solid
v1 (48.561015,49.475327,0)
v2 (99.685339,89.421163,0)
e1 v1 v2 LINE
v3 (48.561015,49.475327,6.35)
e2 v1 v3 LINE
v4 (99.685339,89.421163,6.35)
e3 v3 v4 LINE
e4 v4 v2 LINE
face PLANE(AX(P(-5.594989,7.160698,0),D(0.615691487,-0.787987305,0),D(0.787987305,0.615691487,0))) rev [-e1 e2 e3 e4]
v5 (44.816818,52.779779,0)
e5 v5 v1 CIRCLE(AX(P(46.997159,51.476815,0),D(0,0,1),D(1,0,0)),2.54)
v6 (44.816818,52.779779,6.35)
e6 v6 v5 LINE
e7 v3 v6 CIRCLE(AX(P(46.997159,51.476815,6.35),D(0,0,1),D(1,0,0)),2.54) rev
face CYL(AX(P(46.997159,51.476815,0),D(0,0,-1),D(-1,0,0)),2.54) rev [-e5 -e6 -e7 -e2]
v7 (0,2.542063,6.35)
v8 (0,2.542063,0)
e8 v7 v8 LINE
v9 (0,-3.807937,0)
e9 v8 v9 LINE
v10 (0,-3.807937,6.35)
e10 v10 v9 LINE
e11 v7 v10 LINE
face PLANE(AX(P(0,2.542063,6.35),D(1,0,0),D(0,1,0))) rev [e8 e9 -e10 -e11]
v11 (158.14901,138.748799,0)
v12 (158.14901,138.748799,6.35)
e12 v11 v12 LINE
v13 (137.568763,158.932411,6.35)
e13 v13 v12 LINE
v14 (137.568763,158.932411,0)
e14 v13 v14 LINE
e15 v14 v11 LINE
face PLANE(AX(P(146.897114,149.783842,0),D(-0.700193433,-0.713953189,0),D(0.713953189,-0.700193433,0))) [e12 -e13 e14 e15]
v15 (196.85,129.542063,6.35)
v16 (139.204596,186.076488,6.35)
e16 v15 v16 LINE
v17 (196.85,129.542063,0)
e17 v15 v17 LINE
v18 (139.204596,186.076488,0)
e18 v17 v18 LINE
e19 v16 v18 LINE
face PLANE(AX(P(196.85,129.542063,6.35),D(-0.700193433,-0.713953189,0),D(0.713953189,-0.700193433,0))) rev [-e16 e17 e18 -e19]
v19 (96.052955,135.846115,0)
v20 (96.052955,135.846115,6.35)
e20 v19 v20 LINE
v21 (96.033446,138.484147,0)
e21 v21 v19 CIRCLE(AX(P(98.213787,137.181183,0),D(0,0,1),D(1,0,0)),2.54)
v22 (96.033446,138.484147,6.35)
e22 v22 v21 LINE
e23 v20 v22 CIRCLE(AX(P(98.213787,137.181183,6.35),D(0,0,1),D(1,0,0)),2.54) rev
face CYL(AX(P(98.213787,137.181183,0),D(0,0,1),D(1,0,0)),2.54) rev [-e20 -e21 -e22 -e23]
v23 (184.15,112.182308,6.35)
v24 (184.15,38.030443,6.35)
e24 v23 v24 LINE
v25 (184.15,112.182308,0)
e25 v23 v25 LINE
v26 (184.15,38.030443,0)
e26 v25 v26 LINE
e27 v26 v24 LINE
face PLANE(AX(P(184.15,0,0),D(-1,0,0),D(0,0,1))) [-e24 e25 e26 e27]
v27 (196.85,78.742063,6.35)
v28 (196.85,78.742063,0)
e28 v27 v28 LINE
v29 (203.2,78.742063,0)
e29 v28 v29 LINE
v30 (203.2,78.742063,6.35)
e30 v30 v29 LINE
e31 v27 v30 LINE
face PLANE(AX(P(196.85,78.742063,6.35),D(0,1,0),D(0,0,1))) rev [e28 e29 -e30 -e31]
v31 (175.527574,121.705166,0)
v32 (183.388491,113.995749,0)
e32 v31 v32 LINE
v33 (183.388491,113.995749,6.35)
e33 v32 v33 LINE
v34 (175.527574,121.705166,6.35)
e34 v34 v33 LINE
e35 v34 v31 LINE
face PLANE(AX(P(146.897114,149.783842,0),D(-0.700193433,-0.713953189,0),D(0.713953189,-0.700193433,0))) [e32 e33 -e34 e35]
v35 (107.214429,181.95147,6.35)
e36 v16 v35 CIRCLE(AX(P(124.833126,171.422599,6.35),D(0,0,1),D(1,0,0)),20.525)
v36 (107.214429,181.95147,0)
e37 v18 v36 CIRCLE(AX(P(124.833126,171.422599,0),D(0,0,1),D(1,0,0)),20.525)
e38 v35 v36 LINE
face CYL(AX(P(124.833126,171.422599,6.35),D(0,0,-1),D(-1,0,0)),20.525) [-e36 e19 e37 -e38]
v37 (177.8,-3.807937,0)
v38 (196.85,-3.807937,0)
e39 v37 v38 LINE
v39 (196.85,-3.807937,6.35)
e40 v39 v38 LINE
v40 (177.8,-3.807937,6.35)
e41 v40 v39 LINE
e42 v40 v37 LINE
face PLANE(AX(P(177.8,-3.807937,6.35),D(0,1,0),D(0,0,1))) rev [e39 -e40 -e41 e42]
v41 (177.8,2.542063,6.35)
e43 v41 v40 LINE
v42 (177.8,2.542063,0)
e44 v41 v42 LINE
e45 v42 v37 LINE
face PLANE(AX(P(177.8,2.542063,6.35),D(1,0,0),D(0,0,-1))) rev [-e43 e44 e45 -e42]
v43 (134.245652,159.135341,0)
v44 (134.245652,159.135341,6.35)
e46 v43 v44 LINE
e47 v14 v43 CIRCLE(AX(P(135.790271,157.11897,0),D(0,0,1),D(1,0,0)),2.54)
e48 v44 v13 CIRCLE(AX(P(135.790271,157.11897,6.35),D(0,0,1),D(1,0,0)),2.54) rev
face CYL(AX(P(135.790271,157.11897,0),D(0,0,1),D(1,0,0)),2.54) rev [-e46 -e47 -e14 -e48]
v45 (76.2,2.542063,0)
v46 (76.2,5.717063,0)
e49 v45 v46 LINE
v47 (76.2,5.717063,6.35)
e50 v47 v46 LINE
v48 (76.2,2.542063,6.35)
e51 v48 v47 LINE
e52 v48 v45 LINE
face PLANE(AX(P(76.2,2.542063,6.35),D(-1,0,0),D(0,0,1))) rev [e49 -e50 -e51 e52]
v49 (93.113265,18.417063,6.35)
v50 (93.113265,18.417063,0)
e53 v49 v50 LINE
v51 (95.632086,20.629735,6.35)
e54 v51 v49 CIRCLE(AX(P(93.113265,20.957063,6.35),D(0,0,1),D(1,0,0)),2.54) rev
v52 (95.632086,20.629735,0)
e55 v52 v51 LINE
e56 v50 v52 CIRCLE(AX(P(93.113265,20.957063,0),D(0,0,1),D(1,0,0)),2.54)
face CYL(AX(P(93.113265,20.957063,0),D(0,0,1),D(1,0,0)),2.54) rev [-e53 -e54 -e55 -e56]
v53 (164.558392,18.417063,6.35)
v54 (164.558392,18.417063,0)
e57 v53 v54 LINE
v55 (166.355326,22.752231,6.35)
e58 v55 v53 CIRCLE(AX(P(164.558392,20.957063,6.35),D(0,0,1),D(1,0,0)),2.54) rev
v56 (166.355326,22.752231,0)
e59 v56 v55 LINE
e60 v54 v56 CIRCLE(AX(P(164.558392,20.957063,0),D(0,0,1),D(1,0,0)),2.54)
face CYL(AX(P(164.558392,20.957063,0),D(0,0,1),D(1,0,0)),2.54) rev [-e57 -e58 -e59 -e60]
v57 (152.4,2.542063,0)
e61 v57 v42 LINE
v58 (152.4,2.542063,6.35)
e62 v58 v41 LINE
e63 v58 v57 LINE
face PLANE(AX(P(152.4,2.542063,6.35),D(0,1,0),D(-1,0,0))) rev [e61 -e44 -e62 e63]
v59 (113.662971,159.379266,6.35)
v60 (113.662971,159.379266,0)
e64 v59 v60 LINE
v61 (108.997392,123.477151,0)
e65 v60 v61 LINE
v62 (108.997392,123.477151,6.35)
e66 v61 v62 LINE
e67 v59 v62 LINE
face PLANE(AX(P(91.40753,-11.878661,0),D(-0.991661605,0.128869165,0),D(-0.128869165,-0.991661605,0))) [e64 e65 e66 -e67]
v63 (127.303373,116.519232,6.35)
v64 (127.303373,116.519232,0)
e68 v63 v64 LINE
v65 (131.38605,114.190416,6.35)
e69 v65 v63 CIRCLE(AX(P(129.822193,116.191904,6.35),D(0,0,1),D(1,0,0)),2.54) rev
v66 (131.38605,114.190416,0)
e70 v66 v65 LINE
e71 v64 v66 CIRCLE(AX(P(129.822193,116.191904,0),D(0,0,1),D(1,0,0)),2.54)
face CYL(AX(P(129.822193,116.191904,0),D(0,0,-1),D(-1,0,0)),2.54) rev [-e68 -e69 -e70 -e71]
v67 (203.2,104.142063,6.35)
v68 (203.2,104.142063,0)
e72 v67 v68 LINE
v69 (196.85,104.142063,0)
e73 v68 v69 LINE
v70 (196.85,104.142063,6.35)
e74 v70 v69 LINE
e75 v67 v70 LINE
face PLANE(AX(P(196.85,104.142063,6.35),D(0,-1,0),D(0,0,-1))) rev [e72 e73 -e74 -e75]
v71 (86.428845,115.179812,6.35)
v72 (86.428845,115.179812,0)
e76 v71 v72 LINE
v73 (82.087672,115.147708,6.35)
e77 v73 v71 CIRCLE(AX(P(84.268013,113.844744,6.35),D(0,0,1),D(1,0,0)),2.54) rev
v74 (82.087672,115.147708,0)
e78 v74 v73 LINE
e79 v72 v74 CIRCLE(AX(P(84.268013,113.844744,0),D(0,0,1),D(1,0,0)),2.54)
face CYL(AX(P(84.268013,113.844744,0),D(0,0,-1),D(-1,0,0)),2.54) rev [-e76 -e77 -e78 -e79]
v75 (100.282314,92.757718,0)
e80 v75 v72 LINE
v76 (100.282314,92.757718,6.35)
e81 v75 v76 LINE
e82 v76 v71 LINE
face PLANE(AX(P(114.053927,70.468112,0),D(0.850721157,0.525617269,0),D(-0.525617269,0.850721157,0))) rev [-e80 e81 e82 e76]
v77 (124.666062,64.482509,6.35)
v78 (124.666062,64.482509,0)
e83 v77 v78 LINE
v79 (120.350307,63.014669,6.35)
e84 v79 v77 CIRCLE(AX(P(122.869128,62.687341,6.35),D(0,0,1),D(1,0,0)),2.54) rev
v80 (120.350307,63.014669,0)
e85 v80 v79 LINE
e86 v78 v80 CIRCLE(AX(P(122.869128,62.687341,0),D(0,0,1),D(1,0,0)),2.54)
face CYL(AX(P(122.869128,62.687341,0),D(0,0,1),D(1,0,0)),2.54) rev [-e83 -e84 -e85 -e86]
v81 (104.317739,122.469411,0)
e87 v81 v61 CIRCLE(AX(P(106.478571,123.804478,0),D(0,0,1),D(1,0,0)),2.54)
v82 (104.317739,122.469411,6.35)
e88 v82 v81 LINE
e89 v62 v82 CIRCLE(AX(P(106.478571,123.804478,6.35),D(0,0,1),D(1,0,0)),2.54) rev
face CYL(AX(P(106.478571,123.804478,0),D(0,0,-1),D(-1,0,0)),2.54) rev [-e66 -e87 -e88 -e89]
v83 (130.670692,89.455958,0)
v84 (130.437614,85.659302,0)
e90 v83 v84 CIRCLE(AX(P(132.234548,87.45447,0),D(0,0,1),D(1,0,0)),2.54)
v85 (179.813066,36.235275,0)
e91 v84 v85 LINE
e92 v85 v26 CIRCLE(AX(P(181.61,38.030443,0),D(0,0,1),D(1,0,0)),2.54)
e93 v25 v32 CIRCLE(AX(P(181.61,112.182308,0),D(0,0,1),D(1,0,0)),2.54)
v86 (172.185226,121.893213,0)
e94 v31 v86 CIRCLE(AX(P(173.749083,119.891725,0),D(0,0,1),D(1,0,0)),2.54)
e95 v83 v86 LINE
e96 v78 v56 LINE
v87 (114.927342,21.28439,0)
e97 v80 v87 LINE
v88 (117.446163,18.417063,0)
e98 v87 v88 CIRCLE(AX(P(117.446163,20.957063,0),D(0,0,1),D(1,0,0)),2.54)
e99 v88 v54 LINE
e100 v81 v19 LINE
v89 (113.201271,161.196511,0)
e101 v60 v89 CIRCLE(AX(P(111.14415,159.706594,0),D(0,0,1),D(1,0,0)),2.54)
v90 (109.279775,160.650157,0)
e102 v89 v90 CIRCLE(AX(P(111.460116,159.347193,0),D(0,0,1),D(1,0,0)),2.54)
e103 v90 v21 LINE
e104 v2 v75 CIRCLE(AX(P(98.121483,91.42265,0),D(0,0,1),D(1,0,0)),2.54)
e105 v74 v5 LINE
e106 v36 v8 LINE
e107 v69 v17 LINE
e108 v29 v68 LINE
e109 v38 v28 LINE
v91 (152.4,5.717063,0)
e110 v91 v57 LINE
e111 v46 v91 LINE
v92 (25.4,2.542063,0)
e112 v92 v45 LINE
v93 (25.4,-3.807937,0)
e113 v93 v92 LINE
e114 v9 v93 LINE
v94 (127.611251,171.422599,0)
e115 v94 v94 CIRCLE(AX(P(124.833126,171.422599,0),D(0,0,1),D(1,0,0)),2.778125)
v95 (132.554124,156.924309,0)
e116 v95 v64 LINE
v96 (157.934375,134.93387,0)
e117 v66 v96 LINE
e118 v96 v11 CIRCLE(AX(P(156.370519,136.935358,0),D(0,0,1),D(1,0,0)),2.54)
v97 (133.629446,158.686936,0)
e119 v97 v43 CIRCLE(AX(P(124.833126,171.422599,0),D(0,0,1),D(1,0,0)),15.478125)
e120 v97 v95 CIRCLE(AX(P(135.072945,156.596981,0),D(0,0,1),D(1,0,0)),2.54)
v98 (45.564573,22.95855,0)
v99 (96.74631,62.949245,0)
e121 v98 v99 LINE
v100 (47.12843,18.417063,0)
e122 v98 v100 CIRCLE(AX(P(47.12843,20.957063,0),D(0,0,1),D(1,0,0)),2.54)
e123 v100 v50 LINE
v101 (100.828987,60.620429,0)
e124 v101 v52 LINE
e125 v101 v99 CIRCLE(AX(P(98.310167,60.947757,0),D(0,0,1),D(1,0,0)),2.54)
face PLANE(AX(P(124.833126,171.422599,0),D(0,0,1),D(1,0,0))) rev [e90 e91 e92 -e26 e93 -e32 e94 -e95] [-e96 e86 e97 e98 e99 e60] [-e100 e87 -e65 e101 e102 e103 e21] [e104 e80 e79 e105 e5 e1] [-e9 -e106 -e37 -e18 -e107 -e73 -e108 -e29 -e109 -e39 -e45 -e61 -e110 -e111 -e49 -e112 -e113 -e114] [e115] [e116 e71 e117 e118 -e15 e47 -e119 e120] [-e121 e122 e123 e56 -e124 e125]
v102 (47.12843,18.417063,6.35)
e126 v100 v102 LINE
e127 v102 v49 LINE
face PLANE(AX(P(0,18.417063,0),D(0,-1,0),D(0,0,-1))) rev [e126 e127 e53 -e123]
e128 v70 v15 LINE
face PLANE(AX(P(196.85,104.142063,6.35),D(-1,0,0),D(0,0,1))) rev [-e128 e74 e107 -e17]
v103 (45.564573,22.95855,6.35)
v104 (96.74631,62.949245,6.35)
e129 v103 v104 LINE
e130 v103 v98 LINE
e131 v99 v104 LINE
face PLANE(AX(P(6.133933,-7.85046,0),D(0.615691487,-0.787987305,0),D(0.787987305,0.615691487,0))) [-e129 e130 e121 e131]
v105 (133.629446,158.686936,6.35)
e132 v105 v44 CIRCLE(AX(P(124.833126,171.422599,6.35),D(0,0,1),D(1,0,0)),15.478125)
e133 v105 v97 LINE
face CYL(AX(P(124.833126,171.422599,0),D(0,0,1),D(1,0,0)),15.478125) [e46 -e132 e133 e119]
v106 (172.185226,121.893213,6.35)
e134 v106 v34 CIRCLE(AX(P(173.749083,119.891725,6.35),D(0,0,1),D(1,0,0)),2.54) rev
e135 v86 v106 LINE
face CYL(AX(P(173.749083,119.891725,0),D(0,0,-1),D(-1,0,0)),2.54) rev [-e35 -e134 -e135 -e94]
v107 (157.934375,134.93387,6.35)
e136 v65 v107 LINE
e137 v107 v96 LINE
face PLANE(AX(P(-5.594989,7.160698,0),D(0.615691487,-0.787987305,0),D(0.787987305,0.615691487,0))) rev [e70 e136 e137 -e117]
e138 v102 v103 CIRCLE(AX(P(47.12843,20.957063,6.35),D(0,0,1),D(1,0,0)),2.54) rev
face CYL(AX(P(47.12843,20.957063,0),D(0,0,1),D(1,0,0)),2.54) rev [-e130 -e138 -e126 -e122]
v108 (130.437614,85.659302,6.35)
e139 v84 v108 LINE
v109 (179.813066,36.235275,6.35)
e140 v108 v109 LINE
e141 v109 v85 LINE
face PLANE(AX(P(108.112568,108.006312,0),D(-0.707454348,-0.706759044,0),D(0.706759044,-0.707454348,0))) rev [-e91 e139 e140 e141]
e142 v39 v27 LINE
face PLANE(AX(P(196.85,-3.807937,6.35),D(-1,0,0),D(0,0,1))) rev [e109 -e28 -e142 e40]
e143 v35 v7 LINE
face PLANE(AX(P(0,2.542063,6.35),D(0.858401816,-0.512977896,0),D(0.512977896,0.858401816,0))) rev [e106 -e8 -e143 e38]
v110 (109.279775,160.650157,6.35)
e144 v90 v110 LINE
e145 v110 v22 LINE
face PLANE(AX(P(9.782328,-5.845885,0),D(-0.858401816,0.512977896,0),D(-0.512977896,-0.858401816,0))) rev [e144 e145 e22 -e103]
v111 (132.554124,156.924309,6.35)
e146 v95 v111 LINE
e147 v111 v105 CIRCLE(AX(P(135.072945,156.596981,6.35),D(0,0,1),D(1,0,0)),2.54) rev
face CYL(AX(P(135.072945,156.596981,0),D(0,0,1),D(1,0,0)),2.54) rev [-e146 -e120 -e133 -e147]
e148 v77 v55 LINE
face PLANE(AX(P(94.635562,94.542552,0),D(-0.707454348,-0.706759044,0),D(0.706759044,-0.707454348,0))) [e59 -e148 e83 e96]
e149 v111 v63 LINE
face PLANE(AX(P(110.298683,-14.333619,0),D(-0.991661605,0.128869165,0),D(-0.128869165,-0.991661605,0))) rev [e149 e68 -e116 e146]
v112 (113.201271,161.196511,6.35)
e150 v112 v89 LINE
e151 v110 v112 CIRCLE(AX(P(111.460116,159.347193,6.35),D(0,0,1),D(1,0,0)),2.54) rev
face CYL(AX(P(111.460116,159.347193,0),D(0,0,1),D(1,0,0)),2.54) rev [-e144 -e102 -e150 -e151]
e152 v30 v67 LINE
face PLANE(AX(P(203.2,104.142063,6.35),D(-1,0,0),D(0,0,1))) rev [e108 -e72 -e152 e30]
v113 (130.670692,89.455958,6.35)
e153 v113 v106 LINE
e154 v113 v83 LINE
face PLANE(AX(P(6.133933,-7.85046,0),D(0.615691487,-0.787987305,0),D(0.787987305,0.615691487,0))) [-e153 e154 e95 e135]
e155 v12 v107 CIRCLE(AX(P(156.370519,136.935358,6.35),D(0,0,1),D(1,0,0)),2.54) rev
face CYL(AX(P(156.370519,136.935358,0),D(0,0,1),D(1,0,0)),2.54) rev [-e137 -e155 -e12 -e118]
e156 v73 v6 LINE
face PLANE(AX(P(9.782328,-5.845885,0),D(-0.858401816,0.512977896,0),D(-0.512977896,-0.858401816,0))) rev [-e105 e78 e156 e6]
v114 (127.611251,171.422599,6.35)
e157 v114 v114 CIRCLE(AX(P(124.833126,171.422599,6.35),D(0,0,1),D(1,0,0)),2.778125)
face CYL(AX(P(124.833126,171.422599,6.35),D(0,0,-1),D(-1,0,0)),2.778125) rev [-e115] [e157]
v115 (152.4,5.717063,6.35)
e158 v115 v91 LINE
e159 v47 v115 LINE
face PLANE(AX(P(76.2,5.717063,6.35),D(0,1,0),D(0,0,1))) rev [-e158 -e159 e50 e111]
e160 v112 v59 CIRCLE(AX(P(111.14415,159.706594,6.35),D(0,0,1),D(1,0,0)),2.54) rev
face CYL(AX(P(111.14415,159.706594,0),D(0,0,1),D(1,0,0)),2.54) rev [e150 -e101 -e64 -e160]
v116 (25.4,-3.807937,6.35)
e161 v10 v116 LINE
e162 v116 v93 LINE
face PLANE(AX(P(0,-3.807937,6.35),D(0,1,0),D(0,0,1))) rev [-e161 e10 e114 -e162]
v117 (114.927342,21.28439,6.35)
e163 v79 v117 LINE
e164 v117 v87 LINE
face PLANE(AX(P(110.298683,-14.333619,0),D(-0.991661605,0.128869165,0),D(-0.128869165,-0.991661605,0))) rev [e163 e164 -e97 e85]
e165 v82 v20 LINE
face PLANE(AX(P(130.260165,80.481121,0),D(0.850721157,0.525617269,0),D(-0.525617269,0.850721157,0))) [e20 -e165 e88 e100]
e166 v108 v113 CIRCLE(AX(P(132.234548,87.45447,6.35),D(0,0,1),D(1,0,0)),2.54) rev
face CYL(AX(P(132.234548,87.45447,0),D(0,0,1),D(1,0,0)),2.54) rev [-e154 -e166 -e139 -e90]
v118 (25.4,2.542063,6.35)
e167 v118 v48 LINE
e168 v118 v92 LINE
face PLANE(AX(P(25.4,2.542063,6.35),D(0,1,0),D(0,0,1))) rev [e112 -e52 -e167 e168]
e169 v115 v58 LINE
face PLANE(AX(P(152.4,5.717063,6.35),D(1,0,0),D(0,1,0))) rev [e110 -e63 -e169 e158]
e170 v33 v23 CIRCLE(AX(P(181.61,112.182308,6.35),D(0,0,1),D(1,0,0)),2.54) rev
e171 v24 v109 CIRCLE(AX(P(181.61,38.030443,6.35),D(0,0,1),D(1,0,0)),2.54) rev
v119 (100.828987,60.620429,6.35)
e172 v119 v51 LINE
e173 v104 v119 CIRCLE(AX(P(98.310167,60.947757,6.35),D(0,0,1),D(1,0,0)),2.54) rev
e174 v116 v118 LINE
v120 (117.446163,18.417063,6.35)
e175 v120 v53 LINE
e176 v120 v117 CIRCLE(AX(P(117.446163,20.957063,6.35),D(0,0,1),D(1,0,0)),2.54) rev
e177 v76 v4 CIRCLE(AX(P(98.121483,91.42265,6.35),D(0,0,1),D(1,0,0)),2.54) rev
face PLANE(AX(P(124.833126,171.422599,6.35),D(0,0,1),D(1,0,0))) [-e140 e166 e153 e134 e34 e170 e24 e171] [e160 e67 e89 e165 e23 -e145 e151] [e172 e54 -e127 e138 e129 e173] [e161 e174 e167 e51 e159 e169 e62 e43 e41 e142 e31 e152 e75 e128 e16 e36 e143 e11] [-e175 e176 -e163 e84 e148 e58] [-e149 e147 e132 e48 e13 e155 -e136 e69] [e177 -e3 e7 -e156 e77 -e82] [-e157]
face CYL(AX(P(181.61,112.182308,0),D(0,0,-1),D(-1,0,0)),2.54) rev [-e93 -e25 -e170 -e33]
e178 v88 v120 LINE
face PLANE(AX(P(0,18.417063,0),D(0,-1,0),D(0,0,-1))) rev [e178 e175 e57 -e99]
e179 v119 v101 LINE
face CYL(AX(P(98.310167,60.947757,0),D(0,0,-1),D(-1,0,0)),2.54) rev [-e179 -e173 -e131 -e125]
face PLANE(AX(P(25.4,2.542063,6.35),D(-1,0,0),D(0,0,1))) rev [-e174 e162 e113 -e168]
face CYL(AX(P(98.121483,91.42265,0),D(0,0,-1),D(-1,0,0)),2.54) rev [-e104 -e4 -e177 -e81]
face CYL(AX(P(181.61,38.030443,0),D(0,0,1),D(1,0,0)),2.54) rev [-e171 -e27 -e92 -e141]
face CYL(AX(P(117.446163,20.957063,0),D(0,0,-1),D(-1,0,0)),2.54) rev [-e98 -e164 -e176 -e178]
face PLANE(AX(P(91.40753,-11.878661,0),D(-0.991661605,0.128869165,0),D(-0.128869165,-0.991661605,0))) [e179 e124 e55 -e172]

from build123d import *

# Parameters (mm, degrees)
SKETCH2_R           = 2.778125
BOSS_EXTRUDE1_DEPTH = 6.35
CUT_EXTRUDE1_DEPTH  = 280.596929737
FILLET1_R           = 2.54


with BuildPart() as part:
    # Sketch2 → Boss-Extrude1 (new body)
    with BuildSketch(Plane.XY):
        with BuildLine():
            Line((25.4, 2.542062626), (76.2, 2.542062626))
            Line((76.2, 2.542062626), (76.2, 5.717062626))
            Line((76.2, 5.717062626), (152.4, 5.717062626))
            Line((152.4, 5.717062626), (152.4, 2.542062626))
            Line((152.4, 2.542062626), (177.8, 2.542062626))
            Line((177.8, 2.542062626), (177.8, -3.807937374))
            Line((177.8, -3.807937374), (196.85, -3.807937374))
            Line((196.85, -3.807937374), (196.85, 78.742062626))
            Line((196.85, 78.742062626), (203.2, 78.742062626))
            Line((203.2, 78.742062626), (203.2, 104.142062626))
            Line((203.2, 104.142062626), (196.85, 104.142062626))
            Line((196.85, 104.142062626), (196.85, 129.542062626))
            Line((196.85, 129.542062626), (139.204596213, 186.076487834))
            ThreePointArc((139.204596213, 186.076487834), (122.208232851, 191.779061014), (107.214428724, 181.951469947))
            Line((107.214428724, 181.951469947), (0, 2.542062626))
            Line((0, 2.542062626), (0, -3.807937374))
            Line((0, -3.807937374), (25.4, -3.807937374))
            Line((25.4, -3.807937374), (25.4, 2.542062626))
        make_face()
        with Locations((124.833126, 171.422598626)):
            Circle(SKETCH2_R, mode=Mode.SUBTRACT)
    extrude(amount=BOSS_EXTRUDE1_DEPTH)

    # Sketch4 → Cut-Extrude1 (cut, through all)
    with BuildSketch(Plane.XY.offset(6.35)):
        with BuildLine():
            ThreePointArc((113.815309866, 160.551532388), (112.421969705, 162.174055338), (111.26558656, 163.973153877))
            Line((111.26558656, 163.973153877), (95.241664491, 137.159203595))
            Line((95.241664491, 137.159203595), (108.075962418, 116.386657845))
            Line((108.075962418, 116.386657845), (113.815309866, 160.551532388))
        make_face()
        with BuildLine():
            Line((160.218857543, 136.71884322), (135.883782706, 160.584917146))
            ThreePointArc((135.883782706, 160.584917146), (134.376571421, 159.23674605), (132.706463437, 158.096574796))
            Line((132.706463437, 158.096574796), (126.50513789, 110.376730818))
            Line((126.50513789, 110.376730818), (160.218857543, 136.71884322))
        make_face()
        Polygon((101.478261059, 90.822056657), (84.231843224, 118.735699112), (37.832728657, 41.092813319), align=None)
        Polygon((184.15, 113.248916833), (173.938776136, 123.263343551), (128.409628791, 87.689282626), (184.15, 31.894074467), align=None)
        Polygon((101.62722196, 66.762930434), (39.752190498, 18.417062626), (95.344542887, 18.417062626), align=None)
        Polygon((170.686233709, 18.417062626), (121.01587543, 68.136286224), (114.554724978, 18.417062626), align=None)
    extrude(amount=-CUT_EXTRUDE1_DEPTH, mode=Mode.SUBTRACT)

    # Fillet1
    # the kernel refuses this fillet: 2.54 mm, written as the material it adds along each edge
    with BuildSketch(Plane(origin=(101.478261059, 90.822056657, 6.35), x_dir=(-0.787987305363456, -0.6156914865304209, 0), z_dir=(0, 0, -1))) as fillet1_piece_1:
        with BuildLine():
            CenterArc((FILLET1_R * 0.89579463255, FILLET1_R), FILLET1_R, 186.292375304, 83.707624696)
            Line((-FILLET1_R * 0.0981809171118, FILLET1_R * 0.890397962274), (0, 0))
            Line((0, 0), (FILLET1_R * 0.89579463255, 0))
        make_face()
    extrude(amount=6.35)
    with BuildSketch(Plane(origin=(37.832728657, 41.092813319, 6.35), x_dir=(0.7879873053634544, 0.615691486530423, 0), z_dir=(0, 0, -1))) as fillet1_piece_2:
        with BuildLine():
            CenterArc((FILLET1_R * 5.36015588483, -FILLET1_R), FILLET1_R, 90, 158.864572417)
            Line((FILLET1_R * 4.9995822743, -FILLET1_R * 1.9327307604), (0, 0))
            Line((0, 0), (FILLET1_R * 5.36015588483, 0))
        make_face()
    extrude(amount=6.35)
    with BuildSketch(Plane(origin=(84.231843224, 118.735699112, 6.35), x_dir=(0.5256172693760891, -0.8507211565099483, 0), z_dir=(0, 0, -1))) as fillet1_piece_3:
        with BuildLine():
            CenterArc((FILLET1_R * 1.64561036796, FILLET1_R), FILLET1_R, 152.572197113, 117.427802887)
            Line((FILLET1_R * 0.758018400173, FILLET1_R * 1.46063054471), (0, 0))
            Line((0, 0), (FILLET1_R * 1.64561036796, 0))
        make_face()
    extrude(amount=6.35)
    with BuildSketch(Plane(origin=(111.26558656, 163.973153877, 6.35), x_dir=(-0.5129778962436395, -0.8584018161475719, 0), z_dir=(0, 0, -1))) as fillet1_piece_4:
        with BuildLine():
            CenterArc((3.871144204, -2.54), FILLET1_R, 90, 107.056570321)
            ThreePointArc((1.442864529, -3.285022026), (0.816940233, -1.600561505), (0, 0))
            Line((0, 0), (3.871144204, 0))
        make_face()
    extrude(amount=6.35)
    with BuildSketch(Plane(origin=(113.815309866, 160.551532388, 6.35), x_dir=(-0.12886916491369038, -0.9916616047495476, 0), z_dir=(0, 0, -1))) as fillet1_piece_5:
        with BuildLine():
            CenterArc((1.182123264, 2.54), FILLET1_R, 222.036471985, 47.963528015)
            ThreePointArc((-0.704382325, 0.839207048), (-0.344763298, 0.425838049), (0, 0))
            Line((0, 0), (1.182123264, 0))
        make_face()
    extrude(amount=6.35)
    with BuildSketch(Plane(origin=(108.075962418, 116.386657845, 6.35), x_dir=(-0.5256172693760838, 0.8507211565099515, 0), z_dir=(0, 0, -1))) as fillet1_piece_6:
        with BuildLine():
            CenterArc((FILLET1_R * 2.81500526937, FILLET1_R), FILLET1_R, 129.114057402, 140.885942598)
            Line((FILLET1_R * 2.18413907953, FILLET1_R * 1.77589164869), (0, 0))
            Line((0, 0), (FILLET1_R * 2.81500526937, 0))
        make_face()
    extrude(amount=6.35)
    with BuildSketch(Plane(origin=(95.241664491, 137.159203595, 6.35), x_dir=(0.5129778962436408, 0.8584018161475709, 0), z_dir=(0, 0, -1))) as fillet1_piece_7:
        with BuildLine():
            CenterArc((FILLET1_R * 0.607677260346, FILLET1_R), FILLET1_R, 207.427802887, 62.572197113)
            Line((-FILLET1_R * 0.279914707441, FILLET1_R * 0.539369455291), (0, 0))
            Line((0, 0), (FILLET1_R * 0.607677260346, 0))
        make_face()
    extrude(amount=6.35)
    with BuildSketch(Plane(origin=(39.752190498, 18.417062626, 6.35), x_dir=(0.787987305363458, 0.6156914865304186, 0), z_dir=(0, 0, -1))) as fillet1_piece_8:
        with BuildLine():
            CenterArc((FILLET1_R * 2.9040312307, FILLET1_R), FILLET1_R, 128.002182129, 141.997817871)
            Line((FILLET1_R * 2.28833974417, FILLET1_R * 1.78798730536), (0, 0))
            Line((0, 0), (FILLET1_R * 2.9040312307, 0))
        make_face()
    extrude(amount=6.35)
    with BuildSketch(Plane(origin=(101.62722196, 66.762930434, 6.35), x_dir=(-0.7879873053634603, -0.6156914865304155, 0), z_dir=(0, 0, -1))) as fillet1_piece_9:
        with BuildLine():
            CenterArc((FILLET1_R * 2.438641865, -FILLET1_R), FILLET1_R, 90, 135.406432707)
            Line((FILLET1_R * 1.73656875695, -FILLET1_R * 1.71210487357), (0, 0))
            Line((0, 0), (FILLET1_R * 2.438641865, 0))
        make_face()
    extrude(amount=6.35)
    with BuildSketch(Plane(origin=(95.344542887, 18.417062626, 6.35), x_dir=(-1, 0, 0), z_dir=(0, 0, -1))) as fillet1_piece_10:
        with BuildLine():
            CenterArc((FILLET1_R * 0.878455746309, FILLET1_R), FILLET1_R, 187.404250578, 82.595749422)
            Line((-FILLET1_R * 0.11320585844, FILLET1_R * 0.871130835086), (0, 0))
            Line((0, 0), (FILLET1_R * 0.878455746309, 0))
        make_face()
    extrude(amount=6.35)
    with BuildSketch(Plane(origin=(121.01587543, 68.136286224, 6.35), x_dir=(0.7067590436590283, -0.7074543477894356, 0), z_dir=(0, 0, -1))) as fillet1_piece_11:
        with BuildLine():
            CenterArc((FILLET1_R * 2.03333963012, FILLET1_R), FILLET1_R, 142.376080862, 127.623919138)
            Line((FILLET1_R * 1.2413047717, FILLET1_R * 1.61047586606), (0, 0))
            Line((0, 0), (FILLET1_R * 2.03333963012, 0))
        make_face()
    extrude(amount=6.35)
    with BuildSketch(Plane(origin=(170.686233709, 18.417062626, 6.35), x_dir=(-1, 0, 0), z_dir=(0, 0, -1))) as fillet1_piece_12:
        with BuildLine():
            CenterArc((FILLET1_R * 2.41253594524, FILLET1_R), FILLET1_R, 135.028169716, 134.971830284)
            Line((FILLET1_R * 1.70508159745, FILLET1_R * 1.70675904366), (0, 0))
            Line((0, 0), (FILLET1_R * 2.41253594524, 0))
        make_face()
    extrude(amount=6.35)
    with BuildSketch(Plane(origin=(114.554724978, 18.417062626, 6.35), x_dir=(1, 0, 0), z_dir=(0, 0, -1))) as fillet1_piece_13:
        with BuildLine():
            CenterArc((FILLET1_R * 1.13836127113, -FILLET1_R), FILLET1_R, 90, 97.404250578)
            Line((FILLET1_R * 0.14669966638, -FILLET1_R * 1.12886916491), (0, 0))
            Line((0, 0), (FILLET1_R * 1.13836127113, 0))
        make_face()
    extrude(amount=6.35)
    with BuildSketch(Plane(origin=(132.706463437, 158.096574796, 6.35), x_dir=(-0.12886916491355233, -0.9916616047495656, 0), z_dir=(0, 0, -1))) as fillet1_piece_14:
        with BuildLine():
            CenterArc((1.182123264, -2.54), FILLET1_R, 90, 47.963528015)
            ThreePointArc((-0.704382325, -0.839207048), (-0.344763298, -0.425838049), (0, 0))
            Line((0, 0), (1.182123264, 0))
        make_face()
    extrude(amount=6.35)
    with BuildSketch(Plane(origin=(135.883782706, 160.584917146, 6.35), x_dir=(0.7139531891838808, -0.7001934330270213, 0), z_dir=(0, 0, -1))) as fillet1_piece_15:
        with BuildLine():
            CenterArc((2.360070775, 2.54), FILLET1_R, 188.103931403, 81.896068597)
            ThreePointArc((-0.154564753, 2.181938326), (-0.038689543, 1.093703013), (0, 0))
            Line((0, 0), (2.360070775, 0))
        make_face()
    extrude(amount=6.35)
    with BuildSketch(Plane(origin=(160.218857543, 136.71884322, 6.35), x_dir=(-0.7879873053634604, -0.6156914865304155, 0), z_dir=(0, 0, -1))) as fillet1_piece_16:
        with BuildLine():
            CenterArc((FILLET1_R * 1.14139198058, FILLET1_R), FILLET1_R, 172.444707349, 97.555292651)
            Line((FILLET1_R * 0.150073543693, FILLET1_R * 1.13148291406), (0, 0))
            Line((0, 0), (FILLET1_R * 1.14139198058, 0))
        make_face()
    extrude(amount=6.35)
    with BuildSketch(Plane(origin=(126.50513789, 110.376730818, 6.35), x_dir=(0.1288691649135192, 0.9916616047495699, 0), z_dir=(0, 0, -1))) as fillet1_piece_17:
        with BuildLine():
            CenterArc((FILLET1_R * 2.438641865, FILLET1_R), FILLET1_R, 134.593567293, 135.406432707)
            Line((FILLET1_R * 1.73656875695, FILLET1_R * 1.71210487357), (0, 0))
            Line((0, 0), (FILLET1_R * 2.438641865, 0))
        make_face()
    extrude(amount=6.35)
    with BuildSketch(Plane(origin=(184.15, 113.248916833, 6.35), x_dir=(0, -1, 0), z_dir=(0, 0, -1))) as fillet1_piece_18:
        with BuildLine():
            CenterArc((FILLET1_R * 0.41992468346, FILLET1_R), FILLET1_R, 224.44252522, 45.55747478)
            Line((-FILLET1_R * 0.294028505724, FILLET1_R * 0.299806566973), (0, 0))
            Line((0, 0), (FILLET1_R * 0.41992468346, 0))
        make_face()
    extrude(amount=6.35)
    with BuildSketch(Plane(origin=(184.15, 31.894074467, 6.35), x_dir=(-0.7067590436590262, 0.7074543477894377, 0), z_dir=(0, 0, -1))) as fillet1_piece_19:
        with BuildLine():
            CenterArc((FILLET1_R * 2.41589317195, FILLET1_R), FILLET1_R, 134.971830284, 135.028169716)
            Line((FILLET1_R * 1.70913412829, FILLET1_R * 1.70745434779), (0, 0))
            Line((0, 0), (FILLET1_R * 2.41589317195, 0))
        make_face()
    extrude(amount=6.35)
    with BuildSketch(Plane(origin=(128.409628791, 87.689282626, 6.35), x_dir=(0.7879873053634587, 0.6156914865304174, 0), z_dir=(0, 0, -1))) as fillet1_piece_20:
        with BuildLine():
            CenterArc((FILLET1_R * 1.12969130859, FILLET1_R), FILLET1_R, 173.030351844, 96.969648156)
            Line((FILLET1_R * 0.137080737194, FILLET1_R * 1.12134353531), (0, 0))
            Line((0, 0), (FILLET1_R * 1.12969130859, 0))
        make_face()
    extrude(amount=6.35)
    with BuildSketch(Plane(origin=(173.938776136, 123.263343551, 6.35), x_dir=(-0.7879873053634626, -0.6156914865304124, 0), z_dir=(0, 0, -1))) as fillet1_piece_21:
        with BuildLine():
            CenterArc((FILLET1_R * 0.876123204837, -FILLET1_R), FILLET1_R, 90, 82.444707349)
            Line((-FILLET1_R * 0.115195232049, -FILLET1_R * 0.868517085939), (0, 0))
            Line((0, 0), (FILLET1_R * 0.876123204837, 0))
        make_face()
    extrude(amount=6.35)


solid = part.part
